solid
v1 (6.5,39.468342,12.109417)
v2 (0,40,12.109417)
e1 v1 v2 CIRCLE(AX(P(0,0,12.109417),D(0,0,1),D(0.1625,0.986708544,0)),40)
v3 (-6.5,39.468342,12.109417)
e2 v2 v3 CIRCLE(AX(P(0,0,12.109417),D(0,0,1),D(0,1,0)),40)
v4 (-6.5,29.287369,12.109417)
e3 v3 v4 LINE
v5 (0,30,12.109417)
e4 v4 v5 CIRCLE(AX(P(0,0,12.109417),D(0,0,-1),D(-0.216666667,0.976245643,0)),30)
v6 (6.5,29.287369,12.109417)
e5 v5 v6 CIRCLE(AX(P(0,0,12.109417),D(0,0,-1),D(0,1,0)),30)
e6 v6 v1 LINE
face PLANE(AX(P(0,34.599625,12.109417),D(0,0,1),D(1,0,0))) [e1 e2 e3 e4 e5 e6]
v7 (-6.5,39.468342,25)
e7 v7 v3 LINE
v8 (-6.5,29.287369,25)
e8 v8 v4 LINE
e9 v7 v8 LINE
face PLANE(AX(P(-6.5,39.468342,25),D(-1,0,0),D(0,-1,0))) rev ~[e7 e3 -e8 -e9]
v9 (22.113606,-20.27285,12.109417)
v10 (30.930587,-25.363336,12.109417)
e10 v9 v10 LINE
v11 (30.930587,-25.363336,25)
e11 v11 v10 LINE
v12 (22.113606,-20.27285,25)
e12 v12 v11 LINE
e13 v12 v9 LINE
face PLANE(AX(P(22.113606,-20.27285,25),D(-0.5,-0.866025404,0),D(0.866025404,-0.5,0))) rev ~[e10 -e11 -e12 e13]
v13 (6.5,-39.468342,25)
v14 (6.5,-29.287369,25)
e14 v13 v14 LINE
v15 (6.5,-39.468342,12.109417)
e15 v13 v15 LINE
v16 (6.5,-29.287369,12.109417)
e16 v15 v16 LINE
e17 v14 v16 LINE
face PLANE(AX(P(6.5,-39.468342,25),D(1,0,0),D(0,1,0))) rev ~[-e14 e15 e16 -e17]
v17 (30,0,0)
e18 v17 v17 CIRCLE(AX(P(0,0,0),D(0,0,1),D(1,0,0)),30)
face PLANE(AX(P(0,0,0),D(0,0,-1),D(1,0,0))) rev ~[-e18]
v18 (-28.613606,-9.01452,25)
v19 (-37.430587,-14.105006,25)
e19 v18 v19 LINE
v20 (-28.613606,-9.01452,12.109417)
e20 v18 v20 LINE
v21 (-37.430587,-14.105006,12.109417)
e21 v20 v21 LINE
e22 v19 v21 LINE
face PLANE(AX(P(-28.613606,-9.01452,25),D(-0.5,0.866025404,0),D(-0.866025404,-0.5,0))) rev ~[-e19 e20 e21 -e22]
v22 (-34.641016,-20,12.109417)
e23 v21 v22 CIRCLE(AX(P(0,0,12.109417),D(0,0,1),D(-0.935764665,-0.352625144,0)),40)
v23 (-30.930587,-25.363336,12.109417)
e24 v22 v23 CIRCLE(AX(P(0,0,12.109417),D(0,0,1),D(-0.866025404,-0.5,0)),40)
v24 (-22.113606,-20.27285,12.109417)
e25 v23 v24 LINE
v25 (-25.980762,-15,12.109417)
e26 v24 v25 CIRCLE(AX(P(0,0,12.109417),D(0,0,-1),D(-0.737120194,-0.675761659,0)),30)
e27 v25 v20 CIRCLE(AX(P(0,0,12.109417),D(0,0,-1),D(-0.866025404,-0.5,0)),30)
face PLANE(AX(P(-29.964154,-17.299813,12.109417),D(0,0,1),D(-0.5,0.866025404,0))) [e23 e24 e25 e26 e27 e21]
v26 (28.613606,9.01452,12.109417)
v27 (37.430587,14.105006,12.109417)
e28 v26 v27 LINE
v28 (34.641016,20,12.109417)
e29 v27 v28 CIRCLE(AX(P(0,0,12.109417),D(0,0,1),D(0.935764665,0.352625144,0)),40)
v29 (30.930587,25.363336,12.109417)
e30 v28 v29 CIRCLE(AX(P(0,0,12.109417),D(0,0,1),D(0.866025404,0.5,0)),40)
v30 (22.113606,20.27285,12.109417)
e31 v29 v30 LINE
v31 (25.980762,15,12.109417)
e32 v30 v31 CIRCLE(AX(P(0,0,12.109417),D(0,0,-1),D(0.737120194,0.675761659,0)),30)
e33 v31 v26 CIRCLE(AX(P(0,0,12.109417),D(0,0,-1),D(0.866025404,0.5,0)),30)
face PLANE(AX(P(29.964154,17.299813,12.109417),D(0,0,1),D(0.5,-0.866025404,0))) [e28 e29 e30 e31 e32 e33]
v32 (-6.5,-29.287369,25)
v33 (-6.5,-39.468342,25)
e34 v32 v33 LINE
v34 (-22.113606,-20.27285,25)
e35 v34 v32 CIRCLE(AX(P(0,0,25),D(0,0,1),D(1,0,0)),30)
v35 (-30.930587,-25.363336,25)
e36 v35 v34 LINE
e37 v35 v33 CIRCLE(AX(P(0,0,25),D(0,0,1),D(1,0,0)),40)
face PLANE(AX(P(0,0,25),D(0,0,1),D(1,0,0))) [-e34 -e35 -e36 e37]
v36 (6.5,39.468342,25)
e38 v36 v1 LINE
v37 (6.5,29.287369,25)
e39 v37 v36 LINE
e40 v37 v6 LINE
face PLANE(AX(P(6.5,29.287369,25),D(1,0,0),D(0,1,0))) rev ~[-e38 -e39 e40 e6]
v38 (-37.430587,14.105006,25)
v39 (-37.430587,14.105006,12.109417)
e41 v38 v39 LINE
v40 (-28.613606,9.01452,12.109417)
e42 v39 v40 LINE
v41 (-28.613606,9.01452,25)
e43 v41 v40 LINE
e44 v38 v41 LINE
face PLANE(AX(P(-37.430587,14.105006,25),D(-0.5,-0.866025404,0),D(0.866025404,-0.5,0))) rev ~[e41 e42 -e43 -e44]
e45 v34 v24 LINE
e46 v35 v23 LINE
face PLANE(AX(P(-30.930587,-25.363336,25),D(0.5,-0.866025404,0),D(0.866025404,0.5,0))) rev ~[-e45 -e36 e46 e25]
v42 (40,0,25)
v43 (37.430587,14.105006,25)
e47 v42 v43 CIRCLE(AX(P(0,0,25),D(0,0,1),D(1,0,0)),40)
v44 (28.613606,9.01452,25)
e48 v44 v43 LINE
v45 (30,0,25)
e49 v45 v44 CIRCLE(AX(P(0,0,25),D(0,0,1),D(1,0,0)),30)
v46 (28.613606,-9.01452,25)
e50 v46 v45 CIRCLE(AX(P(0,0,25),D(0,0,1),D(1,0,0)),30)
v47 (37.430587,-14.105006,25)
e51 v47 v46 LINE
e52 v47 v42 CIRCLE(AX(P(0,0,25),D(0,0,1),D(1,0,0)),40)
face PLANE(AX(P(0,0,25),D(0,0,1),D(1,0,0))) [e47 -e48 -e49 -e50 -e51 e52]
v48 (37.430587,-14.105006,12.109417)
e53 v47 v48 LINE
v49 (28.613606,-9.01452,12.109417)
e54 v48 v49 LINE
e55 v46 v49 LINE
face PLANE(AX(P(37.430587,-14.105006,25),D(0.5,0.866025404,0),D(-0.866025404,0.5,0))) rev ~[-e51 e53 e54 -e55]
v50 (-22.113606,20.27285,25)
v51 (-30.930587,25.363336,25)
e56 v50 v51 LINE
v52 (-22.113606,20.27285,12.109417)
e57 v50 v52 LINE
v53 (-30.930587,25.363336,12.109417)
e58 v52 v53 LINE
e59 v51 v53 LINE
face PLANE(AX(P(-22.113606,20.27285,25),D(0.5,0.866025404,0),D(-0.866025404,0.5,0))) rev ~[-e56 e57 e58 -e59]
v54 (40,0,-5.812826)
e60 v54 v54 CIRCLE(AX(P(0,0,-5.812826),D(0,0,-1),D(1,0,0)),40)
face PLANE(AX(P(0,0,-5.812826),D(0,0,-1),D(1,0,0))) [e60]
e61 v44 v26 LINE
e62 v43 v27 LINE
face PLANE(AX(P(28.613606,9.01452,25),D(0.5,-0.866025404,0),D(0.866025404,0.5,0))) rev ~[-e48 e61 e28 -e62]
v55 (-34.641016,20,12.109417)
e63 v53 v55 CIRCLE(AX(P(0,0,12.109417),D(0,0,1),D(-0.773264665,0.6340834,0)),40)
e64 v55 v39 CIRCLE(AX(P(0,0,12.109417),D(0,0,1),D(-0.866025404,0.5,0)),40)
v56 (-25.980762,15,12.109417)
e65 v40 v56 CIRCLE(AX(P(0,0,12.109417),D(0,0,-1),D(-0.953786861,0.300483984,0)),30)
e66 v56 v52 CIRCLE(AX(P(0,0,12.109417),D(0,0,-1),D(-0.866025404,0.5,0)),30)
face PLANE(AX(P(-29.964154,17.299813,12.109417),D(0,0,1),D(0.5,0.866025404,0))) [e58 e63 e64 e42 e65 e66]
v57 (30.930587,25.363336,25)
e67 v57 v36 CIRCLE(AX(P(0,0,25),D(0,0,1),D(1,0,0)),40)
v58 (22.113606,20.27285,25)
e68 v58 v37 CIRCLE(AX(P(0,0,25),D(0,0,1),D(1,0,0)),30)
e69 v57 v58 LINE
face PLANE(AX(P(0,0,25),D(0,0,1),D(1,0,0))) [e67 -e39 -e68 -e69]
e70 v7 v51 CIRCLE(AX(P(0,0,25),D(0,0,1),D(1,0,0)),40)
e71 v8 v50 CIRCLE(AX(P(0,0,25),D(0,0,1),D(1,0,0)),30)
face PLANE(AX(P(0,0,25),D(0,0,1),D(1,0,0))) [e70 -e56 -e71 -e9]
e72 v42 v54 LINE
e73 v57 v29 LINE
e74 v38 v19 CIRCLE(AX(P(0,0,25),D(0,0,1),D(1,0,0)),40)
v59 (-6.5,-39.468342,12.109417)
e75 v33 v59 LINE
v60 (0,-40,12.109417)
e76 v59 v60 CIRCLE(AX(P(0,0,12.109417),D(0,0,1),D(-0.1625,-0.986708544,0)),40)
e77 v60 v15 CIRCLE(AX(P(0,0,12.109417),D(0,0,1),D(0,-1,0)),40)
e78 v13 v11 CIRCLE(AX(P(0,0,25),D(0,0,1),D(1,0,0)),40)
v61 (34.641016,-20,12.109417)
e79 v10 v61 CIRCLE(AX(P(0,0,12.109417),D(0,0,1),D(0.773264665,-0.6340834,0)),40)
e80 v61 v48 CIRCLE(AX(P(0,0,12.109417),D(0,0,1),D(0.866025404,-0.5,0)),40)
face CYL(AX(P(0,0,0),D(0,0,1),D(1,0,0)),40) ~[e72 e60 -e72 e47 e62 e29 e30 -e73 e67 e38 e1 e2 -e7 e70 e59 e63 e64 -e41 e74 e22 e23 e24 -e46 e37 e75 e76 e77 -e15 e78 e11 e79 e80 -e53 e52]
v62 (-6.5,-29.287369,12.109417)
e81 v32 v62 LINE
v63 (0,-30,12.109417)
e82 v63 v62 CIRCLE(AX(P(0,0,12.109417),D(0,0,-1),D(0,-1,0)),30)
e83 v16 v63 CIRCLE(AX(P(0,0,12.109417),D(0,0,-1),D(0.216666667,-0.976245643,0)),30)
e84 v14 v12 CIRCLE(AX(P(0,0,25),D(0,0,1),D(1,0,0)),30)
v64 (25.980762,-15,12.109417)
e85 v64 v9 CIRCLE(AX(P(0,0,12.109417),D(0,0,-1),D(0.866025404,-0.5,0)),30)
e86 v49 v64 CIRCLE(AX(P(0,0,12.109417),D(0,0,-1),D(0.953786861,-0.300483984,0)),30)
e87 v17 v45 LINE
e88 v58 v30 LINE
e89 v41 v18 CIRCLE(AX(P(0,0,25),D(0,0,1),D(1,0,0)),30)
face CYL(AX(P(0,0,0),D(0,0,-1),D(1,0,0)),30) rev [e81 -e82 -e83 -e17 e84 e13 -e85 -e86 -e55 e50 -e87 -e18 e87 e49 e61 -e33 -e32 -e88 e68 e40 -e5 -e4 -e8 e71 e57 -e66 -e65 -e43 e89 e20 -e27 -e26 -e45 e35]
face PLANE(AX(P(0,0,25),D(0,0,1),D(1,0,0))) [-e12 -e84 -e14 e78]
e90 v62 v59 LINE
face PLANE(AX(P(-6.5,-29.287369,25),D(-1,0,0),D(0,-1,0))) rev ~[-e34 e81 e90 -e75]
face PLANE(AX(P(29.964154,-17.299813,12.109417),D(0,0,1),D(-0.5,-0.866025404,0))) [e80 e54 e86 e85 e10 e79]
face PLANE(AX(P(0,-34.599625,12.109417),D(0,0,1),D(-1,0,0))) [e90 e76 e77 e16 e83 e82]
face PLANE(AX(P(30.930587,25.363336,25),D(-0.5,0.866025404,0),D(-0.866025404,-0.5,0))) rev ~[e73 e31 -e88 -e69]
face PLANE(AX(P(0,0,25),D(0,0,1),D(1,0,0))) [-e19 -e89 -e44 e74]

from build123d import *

# Parameters (mm, degrees)
F0_R            = 40
F0_R_2          = 30
F1_DEPTH        = 25
F3_DEPTH        = 12.8905829042
F3_COPIES_COUNT = 6
F5_R            = 40
F5_R_2          = 30
F6_DEPTH        = 5.8128256351


# Not quite as in the source:
# - a pattern or mirror of a feature is missing from the dataset's text; its kind, count and spacing are read off the source's solid


with BuildPart() as f1:
    # F0 (on Top) → F1 (new body)
    with BuildSketch(Plane.XY):
        Circle(F0_R)
        Circle(F0_R_2, mode=Mode.SUBTRACT)
    extrude(amount=F1_DEPTH)

    # F2 (on face) → F3 (cut)
    with BuildSketch(Plane.XY.offset(25)):
        with BuildLine():
            Line((6.5, 29.2873692912), (6.5, 39.4683417437))
            ThreePointArc((6.5, 39.4683417437), (3.2608534351, 39.8668638706), (0, 40))
            ThreePointArc((0, 40), (-3.2608534351, 39.8668638706), (-6.5, 39.4683417437))
            Line((-6.5, 39.4683417437), (-6.5, 29.2873692912))
            ThreePointArc((-6.5, 29.2873692912), (-3.2694740604, 29.8213101551), (0, 30))
            ThreePointArc((0, 30), (3.2694740604, 29.8213101551), (6.5, 29.2873692912))
        make_face()
    f3 = extrude(amount=-F3_DEPTH, mode=Mode.SUBTRACT)

    # F3_copies: F3 ×6 about axis
    f3_copies_axis = Axis((0, 0, 0), (0, 0, 1))
    for i in range(1, F3_COPIES_COUNT):
        add(f3.rotate(f3_copies_axis, i * 360 / F3_COPIES_COUNT), mode=Mode.SUBTRACT)

    # F5 (on face) → F6 (join)
    with BuildSketch(Plane(origin=(0, 0, 0), x_dir=(1, 0, 0), z_dir=(0, 0, -1))):
        Circle(F5_R)
        Circle(F5_R_2, mode=Mode.SUBTRACT)
        Circle(F5_R)
    extrude(amount=F6_DEPTH)


solid = f1.part
